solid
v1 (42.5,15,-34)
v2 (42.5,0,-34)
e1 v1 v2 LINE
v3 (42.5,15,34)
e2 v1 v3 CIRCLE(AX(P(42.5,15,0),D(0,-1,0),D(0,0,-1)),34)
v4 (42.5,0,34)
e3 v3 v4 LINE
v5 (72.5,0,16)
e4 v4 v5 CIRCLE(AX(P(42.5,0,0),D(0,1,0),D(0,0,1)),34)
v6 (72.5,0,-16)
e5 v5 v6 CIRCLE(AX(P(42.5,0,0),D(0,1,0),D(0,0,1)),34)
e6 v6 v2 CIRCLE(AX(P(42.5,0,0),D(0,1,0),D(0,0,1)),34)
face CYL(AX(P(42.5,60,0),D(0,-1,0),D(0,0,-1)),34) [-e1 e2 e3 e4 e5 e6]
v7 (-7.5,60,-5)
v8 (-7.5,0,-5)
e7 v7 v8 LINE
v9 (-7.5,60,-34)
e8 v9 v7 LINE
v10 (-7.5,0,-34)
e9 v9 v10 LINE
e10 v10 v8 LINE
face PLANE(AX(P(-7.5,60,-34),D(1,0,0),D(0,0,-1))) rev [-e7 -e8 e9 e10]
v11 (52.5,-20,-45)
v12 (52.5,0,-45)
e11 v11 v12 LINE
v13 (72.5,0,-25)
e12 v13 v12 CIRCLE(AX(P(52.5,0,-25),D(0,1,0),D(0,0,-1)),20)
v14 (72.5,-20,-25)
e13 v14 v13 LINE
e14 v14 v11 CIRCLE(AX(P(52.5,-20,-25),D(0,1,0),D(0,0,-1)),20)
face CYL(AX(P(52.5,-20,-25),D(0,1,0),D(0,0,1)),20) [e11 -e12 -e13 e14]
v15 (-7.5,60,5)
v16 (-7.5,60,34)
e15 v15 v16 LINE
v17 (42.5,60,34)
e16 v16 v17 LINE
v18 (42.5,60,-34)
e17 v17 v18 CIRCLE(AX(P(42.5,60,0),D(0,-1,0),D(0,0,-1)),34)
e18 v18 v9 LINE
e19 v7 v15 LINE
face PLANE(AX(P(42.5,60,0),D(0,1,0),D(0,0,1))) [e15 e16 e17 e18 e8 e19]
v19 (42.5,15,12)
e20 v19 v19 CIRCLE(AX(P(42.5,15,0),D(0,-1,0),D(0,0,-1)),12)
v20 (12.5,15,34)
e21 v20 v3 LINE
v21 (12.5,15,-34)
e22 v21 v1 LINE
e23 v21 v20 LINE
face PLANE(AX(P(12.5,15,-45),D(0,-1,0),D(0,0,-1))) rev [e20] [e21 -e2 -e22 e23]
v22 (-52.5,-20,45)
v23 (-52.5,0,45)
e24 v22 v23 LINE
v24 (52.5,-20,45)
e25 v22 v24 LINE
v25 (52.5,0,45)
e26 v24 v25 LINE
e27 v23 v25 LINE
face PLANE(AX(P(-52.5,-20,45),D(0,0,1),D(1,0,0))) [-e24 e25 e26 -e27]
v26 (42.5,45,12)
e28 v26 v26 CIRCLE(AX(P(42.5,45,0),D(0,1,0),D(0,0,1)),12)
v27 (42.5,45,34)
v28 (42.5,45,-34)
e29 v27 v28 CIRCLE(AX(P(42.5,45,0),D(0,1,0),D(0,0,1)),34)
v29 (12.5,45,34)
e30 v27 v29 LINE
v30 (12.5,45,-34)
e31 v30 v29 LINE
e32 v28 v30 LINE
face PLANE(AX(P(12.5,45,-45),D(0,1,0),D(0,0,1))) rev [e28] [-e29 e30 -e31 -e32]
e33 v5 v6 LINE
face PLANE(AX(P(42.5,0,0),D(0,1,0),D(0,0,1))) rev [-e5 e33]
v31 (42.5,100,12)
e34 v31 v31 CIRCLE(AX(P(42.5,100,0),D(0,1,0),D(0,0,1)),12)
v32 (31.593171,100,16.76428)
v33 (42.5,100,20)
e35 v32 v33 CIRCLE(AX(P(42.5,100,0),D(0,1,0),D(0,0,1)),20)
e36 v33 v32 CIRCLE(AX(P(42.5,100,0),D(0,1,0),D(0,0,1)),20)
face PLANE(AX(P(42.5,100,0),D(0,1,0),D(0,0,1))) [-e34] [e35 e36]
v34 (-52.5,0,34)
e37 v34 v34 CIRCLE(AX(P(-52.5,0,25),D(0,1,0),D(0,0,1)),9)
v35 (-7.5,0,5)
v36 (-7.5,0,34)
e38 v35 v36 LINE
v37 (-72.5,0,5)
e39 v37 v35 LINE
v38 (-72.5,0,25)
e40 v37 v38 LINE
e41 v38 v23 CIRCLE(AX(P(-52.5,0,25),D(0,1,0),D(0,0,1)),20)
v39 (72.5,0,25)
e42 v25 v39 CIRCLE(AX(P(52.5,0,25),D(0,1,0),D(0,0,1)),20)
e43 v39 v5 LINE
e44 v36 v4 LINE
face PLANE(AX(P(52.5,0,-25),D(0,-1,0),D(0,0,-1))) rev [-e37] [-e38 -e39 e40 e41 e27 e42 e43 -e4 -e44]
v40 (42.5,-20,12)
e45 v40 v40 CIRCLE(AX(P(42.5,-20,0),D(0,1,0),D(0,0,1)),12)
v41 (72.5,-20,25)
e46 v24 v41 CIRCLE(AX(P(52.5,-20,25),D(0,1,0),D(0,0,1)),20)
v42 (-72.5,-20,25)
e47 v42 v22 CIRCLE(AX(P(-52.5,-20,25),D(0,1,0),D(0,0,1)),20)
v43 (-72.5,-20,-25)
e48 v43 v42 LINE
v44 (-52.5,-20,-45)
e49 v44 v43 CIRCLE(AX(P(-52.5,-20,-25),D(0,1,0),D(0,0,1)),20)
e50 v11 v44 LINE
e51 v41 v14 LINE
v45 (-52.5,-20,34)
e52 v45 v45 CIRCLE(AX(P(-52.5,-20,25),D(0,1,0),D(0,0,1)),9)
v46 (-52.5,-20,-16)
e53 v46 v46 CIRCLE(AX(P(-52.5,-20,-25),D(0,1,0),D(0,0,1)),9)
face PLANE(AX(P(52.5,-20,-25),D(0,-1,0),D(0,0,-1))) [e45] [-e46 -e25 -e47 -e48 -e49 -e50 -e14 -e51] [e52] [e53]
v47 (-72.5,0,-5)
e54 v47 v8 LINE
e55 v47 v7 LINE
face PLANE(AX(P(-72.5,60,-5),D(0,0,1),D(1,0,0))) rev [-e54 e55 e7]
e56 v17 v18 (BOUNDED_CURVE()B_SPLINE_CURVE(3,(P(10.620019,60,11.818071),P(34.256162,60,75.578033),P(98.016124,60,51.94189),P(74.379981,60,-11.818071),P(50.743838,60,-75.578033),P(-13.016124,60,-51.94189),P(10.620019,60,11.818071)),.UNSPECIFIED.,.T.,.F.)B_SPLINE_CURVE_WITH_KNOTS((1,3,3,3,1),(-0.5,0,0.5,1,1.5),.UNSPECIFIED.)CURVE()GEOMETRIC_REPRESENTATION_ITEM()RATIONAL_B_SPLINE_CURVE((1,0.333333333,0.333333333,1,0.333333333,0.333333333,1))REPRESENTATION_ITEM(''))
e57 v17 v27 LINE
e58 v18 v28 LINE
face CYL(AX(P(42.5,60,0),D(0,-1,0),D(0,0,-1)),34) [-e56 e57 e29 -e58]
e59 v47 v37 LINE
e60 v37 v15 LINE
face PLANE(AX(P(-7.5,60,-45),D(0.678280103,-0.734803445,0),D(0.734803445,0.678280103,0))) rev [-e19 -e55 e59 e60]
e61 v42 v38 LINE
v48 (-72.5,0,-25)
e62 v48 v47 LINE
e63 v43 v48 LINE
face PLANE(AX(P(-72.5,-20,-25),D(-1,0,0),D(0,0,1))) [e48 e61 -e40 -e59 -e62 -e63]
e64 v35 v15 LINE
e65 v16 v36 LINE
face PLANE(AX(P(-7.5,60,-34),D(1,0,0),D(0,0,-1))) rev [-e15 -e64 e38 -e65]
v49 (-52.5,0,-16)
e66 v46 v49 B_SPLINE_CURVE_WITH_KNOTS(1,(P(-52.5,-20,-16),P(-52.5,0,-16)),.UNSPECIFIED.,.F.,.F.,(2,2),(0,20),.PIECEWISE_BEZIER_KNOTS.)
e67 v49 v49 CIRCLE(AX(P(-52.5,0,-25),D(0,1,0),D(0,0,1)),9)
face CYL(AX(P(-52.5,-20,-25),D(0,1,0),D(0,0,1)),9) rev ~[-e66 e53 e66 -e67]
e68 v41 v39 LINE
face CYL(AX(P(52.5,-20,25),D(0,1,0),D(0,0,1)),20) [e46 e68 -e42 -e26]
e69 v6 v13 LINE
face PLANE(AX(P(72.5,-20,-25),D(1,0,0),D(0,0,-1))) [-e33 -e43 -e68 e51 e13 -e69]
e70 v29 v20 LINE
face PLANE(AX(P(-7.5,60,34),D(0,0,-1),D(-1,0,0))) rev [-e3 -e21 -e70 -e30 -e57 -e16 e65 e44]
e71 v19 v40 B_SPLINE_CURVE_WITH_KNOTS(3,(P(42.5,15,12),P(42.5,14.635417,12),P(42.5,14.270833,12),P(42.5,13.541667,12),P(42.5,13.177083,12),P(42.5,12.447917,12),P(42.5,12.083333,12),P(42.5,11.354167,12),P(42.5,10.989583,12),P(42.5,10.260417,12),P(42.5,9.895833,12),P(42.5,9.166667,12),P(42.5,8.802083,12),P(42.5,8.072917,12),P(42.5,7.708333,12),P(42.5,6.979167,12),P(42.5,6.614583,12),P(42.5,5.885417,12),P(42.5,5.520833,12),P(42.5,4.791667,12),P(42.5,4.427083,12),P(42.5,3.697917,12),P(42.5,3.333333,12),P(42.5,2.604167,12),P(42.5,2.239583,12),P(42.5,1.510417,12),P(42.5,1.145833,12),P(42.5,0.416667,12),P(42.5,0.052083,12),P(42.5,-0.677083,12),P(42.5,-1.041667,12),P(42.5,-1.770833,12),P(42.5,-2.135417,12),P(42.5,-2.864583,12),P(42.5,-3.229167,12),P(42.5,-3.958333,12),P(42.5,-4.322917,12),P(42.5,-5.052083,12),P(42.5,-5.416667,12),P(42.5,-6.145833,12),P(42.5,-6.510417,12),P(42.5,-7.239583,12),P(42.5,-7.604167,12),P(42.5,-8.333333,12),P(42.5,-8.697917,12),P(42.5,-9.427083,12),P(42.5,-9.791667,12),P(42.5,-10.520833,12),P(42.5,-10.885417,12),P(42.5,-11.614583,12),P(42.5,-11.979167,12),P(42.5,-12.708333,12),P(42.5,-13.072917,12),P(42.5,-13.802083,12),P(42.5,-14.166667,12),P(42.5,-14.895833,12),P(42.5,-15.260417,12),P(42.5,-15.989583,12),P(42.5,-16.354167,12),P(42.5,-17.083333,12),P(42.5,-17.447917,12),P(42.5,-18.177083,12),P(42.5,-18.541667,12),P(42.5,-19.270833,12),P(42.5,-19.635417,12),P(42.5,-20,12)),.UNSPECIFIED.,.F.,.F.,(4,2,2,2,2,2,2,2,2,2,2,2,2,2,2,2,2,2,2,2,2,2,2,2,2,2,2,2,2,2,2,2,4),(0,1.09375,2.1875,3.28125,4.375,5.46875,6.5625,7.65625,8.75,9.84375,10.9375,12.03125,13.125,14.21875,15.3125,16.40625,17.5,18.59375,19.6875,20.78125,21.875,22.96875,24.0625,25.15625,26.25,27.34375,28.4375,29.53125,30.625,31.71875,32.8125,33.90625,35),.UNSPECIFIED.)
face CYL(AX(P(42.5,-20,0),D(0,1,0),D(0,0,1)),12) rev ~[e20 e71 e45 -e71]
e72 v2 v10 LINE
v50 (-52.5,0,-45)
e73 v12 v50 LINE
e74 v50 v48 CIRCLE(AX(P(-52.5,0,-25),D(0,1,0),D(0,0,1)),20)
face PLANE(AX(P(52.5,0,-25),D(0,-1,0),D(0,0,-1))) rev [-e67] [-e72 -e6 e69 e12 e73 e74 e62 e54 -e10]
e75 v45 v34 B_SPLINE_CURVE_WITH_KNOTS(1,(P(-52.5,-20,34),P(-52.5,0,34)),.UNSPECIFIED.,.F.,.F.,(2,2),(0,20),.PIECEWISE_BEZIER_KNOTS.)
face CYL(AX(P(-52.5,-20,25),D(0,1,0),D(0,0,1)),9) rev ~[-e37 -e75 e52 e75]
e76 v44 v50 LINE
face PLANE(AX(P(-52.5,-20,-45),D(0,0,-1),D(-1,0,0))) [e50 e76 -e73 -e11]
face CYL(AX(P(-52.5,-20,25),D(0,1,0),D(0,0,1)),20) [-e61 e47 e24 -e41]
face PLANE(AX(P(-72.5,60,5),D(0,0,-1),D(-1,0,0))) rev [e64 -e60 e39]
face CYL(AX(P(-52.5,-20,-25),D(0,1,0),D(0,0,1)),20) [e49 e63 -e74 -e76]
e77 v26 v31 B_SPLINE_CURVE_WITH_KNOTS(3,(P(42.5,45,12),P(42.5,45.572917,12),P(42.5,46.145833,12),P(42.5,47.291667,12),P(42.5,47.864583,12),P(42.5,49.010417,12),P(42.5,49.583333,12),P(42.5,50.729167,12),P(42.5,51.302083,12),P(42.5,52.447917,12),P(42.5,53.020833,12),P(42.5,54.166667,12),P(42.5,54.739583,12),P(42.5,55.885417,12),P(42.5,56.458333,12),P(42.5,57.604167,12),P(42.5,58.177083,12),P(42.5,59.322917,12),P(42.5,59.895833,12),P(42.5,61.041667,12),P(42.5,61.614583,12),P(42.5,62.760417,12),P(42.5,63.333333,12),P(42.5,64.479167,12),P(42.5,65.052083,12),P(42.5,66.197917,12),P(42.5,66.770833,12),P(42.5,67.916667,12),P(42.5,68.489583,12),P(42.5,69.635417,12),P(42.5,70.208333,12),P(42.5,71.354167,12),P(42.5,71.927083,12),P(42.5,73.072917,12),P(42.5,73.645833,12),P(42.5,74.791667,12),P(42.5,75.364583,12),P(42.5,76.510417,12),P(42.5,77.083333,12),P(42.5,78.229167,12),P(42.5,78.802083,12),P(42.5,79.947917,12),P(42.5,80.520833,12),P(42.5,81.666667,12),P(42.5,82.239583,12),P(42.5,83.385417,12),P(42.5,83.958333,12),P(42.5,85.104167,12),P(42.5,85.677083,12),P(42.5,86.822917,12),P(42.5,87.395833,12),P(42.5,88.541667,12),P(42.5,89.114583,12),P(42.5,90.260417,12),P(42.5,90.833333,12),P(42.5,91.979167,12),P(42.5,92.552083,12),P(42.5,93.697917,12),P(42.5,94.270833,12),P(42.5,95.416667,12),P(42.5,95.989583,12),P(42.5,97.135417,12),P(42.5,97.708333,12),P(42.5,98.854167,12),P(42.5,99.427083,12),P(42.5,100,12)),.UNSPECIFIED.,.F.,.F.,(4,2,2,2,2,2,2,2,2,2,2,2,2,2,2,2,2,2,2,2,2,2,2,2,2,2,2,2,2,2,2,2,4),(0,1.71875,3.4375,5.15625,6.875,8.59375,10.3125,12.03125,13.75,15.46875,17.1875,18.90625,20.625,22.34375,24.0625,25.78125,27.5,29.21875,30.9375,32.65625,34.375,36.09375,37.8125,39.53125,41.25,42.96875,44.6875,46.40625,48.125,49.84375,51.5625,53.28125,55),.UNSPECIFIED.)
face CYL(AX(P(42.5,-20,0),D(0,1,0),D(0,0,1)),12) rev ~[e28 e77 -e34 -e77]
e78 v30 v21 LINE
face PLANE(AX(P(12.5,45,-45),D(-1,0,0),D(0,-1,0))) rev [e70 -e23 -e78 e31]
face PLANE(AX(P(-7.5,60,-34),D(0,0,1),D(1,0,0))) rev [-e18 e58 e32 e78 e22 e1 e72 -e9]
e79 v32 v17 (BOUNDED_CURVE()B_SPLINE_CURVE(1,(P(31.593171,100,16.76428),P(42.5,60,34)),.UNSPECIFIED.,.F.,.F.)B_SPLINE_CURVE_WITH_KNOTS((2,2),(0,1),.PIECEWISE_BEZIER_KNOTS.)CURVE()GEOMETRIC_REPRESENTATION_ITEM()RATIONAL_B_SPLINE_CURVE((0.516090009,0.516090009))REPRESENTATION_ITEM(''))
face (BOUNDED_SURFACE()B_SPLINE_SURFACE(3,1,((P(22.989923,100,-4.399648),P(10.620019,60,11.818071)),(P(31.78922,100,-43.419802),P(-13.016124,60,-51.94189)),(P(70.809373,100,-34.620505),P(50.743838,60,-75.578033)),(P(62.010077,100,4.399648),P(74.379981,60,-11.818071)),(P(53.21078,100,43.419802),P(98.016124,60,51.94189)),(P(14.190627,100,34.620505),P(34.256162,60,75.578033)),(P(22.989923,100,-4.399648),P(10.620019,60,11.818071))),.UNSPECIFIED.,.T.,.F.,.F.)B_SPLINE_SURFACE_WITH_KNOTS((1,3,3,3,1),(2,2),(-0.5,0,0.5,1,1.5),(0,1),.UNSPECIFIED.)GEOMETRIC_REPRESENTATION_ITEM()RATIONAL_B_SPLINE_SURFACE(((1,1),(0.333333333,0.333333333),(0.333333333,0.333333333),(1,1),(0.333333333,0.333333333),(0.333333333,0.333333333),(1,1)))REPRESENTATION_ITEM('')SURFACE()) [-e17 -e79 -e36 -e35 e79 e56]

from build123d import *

# Parameters (mm, degrees)
SKETCH1_R           = 9
BOSS_EXTRUDE1_DEPTH = 20
BOSS_EXTRUDE2_DEPTH = 60
SKETCH7_R           = 12
CUT_EXTRUDE1_DEPTH  = 150.255653211
SKETCH8_W           = 103.314171972
SKETCH8_H           = 30
CUT_EXTRUDE2_DEPTH  = 149.637983151
SKETCH10_W          = 10
SKETCH10_H          = 60
BOSS_EXTRUDE3_DEPTH = 65
CUT_EXTRUDE3_DEPTH  = 136.470476619


with BuildPart() as part:
    # Sketch1 → Boss-Extrude1 (new body)
    with BuildSketch(Plane(origin=(0, 0, 0), x_dir=(1, 0, 0), z_dir=(0, 1, 0))):
        with BuildLine():
            Line((-52.5, 45), (52.5, 45))
            ThreePointArc((52.5, 45), (66.642135624, 39.142135624), (72.5, 25))
            Line((72.5, 25), (72.5, -25))
            ThreePointArc((72.5, -25), (66.642135624, -39.142135624), (52.5, -45))
            Line((52.5, -45), (-52.5, -45))
            ThreePointArc((-52.5, -45), (-66.642135624, -39.142135624), (-72.5, -25))
            Line((-72.5, -25), (-72.5, 25))
            ThreePointArc((-72.5, 25), (-66.642135624, 39.142135624), (-52.5, 45))
        make_face()
        with Locations(Location((-52.5, 25, 0), (0, 0, 270))):
            Circle(SKETCH1_R, mode=Mode.SUBTRACT)
        with Locations(Location((-52.5, -25, 0), (0, 0, 270))):
            Circle(SKETCH1_R, mode=Mode.SUBTRACT)
    extrude(amount=-BOSS_EXTRUDE1_DEPTH)

    # Sketch2 → Boss-Extrude2 (add)
    with BuildSketch(Plane(origin=(0, 0, 0), x_dir=(1, 0, 0), z_dir=(0, 1, 0))):
        with BuildLine():
            Line((-7.5, 34), (42.5, 34))
            ThreePointArc((42.5, 34), (76.5, 0), (42.5, -34))
            Line((42.5, -34), (-7.5, -34))
            Line((-7.5, -34), (-7.5, 34))
        make_face()
    extrude(amount=BOSS_EXTRUDE2_DEPTH)

    # Loft1: read off the stored shape, not the designer's step
    # Loft1: loft between two sections, ruled curve by curve
    loft1_from = [
        Edge.make_bspline([(22.989923238, 100, -4.399648251), (31.789219739, 100, -43.419801775), (70.809373263, 100, -34.620505274), (62.010076762, 100, 4.399648251), (53.210780261, 100, 43.419801775), (14.190626737, 100, 34.620505274), (22.989923238, 100, -4.399648251)], [0, 0, 0, 0, 0.5, 0.5, 0.5, 1, 1, 1, 1], 3, [1, 0.333333333, 0.333333333, 1, 0.333333333, 0.333333333, 1]),
    ]
    loft1_to = [
        Edge.make_bspline([(10.620019024, 60, 11.818071457), (-13.01612389, 60, -51.941890495), (50.743838062, 60, -75.578033409), (74.379980976, 60, -11.818071457), (98.01612389, 60, 51.941890495), (34.256161938, 60, 75.578033409), (10.620019024, 60, 11.818071457)], [0, 0, 0, 0, 0.5, 0.5, 0.5, 1, 1, 1, 1], 3, [1, 0.333333333, 0.333333333, 1, 0.333333333, 0.333333333, 1]),
    ]
    loft1 = Solid(Shell([*[Face.make_surface_from_curves(loft1_from[k], loft1_to[k]) for k in range(1)], Face(Wire(loft1_from)), Face(Wire(loft1_to))]))
    add(loft1)

    # Sketch7 → Cut-Extrude1 (cut, through all)
    with BuildSketch(Plane(origin=(0, 100, 0), x_dir=(1, 0, 0), z_dir=(0, 1, 0))):
        with Locations(Location((42.5, 0, 0), (0, 0, 270))):
            Circle(SKETCH7_R)
    extrude(amount=-CUT_EXTRUDE1_DEPTH, mode=Mode.SUBTRACT)

    # Sketch8 → Cut-Extrude2 (cut, through all)
    with BuildSketch(Plane.XY.offset(34)):
        with Locations((64.157085986, 30)):
            Rectangle(SKETCH8_W, SKETCH8_H)
    extrude(amount=-CUT_EXTRUDE2_DEPTH, mode=Mode.SUBTRACT)

    # Sketch10 → Boss-Extrude3 (add, through all)
    with BuildSketch(Plane.ZY.offset(7.5)):
        with Locations((0, 30)):
            Rectangle(SKETCH10_W, SKETCH10_H)
    extrude(amount=BOSS_EXTRUDE3_DEPTH)

    # Sketch11 → Cut-Extrude3 (cut, through all)
    with BuildSketch(Plane.XY.offset(5)):
        Polygon((-7.5, 60), (-72.5, 0), (-72.5, 60), align=None)
    extrude(amount=-CUT_EXTRUDE3_DEPTH, mode=Mode.SUBTRACT)


solid = part.part
